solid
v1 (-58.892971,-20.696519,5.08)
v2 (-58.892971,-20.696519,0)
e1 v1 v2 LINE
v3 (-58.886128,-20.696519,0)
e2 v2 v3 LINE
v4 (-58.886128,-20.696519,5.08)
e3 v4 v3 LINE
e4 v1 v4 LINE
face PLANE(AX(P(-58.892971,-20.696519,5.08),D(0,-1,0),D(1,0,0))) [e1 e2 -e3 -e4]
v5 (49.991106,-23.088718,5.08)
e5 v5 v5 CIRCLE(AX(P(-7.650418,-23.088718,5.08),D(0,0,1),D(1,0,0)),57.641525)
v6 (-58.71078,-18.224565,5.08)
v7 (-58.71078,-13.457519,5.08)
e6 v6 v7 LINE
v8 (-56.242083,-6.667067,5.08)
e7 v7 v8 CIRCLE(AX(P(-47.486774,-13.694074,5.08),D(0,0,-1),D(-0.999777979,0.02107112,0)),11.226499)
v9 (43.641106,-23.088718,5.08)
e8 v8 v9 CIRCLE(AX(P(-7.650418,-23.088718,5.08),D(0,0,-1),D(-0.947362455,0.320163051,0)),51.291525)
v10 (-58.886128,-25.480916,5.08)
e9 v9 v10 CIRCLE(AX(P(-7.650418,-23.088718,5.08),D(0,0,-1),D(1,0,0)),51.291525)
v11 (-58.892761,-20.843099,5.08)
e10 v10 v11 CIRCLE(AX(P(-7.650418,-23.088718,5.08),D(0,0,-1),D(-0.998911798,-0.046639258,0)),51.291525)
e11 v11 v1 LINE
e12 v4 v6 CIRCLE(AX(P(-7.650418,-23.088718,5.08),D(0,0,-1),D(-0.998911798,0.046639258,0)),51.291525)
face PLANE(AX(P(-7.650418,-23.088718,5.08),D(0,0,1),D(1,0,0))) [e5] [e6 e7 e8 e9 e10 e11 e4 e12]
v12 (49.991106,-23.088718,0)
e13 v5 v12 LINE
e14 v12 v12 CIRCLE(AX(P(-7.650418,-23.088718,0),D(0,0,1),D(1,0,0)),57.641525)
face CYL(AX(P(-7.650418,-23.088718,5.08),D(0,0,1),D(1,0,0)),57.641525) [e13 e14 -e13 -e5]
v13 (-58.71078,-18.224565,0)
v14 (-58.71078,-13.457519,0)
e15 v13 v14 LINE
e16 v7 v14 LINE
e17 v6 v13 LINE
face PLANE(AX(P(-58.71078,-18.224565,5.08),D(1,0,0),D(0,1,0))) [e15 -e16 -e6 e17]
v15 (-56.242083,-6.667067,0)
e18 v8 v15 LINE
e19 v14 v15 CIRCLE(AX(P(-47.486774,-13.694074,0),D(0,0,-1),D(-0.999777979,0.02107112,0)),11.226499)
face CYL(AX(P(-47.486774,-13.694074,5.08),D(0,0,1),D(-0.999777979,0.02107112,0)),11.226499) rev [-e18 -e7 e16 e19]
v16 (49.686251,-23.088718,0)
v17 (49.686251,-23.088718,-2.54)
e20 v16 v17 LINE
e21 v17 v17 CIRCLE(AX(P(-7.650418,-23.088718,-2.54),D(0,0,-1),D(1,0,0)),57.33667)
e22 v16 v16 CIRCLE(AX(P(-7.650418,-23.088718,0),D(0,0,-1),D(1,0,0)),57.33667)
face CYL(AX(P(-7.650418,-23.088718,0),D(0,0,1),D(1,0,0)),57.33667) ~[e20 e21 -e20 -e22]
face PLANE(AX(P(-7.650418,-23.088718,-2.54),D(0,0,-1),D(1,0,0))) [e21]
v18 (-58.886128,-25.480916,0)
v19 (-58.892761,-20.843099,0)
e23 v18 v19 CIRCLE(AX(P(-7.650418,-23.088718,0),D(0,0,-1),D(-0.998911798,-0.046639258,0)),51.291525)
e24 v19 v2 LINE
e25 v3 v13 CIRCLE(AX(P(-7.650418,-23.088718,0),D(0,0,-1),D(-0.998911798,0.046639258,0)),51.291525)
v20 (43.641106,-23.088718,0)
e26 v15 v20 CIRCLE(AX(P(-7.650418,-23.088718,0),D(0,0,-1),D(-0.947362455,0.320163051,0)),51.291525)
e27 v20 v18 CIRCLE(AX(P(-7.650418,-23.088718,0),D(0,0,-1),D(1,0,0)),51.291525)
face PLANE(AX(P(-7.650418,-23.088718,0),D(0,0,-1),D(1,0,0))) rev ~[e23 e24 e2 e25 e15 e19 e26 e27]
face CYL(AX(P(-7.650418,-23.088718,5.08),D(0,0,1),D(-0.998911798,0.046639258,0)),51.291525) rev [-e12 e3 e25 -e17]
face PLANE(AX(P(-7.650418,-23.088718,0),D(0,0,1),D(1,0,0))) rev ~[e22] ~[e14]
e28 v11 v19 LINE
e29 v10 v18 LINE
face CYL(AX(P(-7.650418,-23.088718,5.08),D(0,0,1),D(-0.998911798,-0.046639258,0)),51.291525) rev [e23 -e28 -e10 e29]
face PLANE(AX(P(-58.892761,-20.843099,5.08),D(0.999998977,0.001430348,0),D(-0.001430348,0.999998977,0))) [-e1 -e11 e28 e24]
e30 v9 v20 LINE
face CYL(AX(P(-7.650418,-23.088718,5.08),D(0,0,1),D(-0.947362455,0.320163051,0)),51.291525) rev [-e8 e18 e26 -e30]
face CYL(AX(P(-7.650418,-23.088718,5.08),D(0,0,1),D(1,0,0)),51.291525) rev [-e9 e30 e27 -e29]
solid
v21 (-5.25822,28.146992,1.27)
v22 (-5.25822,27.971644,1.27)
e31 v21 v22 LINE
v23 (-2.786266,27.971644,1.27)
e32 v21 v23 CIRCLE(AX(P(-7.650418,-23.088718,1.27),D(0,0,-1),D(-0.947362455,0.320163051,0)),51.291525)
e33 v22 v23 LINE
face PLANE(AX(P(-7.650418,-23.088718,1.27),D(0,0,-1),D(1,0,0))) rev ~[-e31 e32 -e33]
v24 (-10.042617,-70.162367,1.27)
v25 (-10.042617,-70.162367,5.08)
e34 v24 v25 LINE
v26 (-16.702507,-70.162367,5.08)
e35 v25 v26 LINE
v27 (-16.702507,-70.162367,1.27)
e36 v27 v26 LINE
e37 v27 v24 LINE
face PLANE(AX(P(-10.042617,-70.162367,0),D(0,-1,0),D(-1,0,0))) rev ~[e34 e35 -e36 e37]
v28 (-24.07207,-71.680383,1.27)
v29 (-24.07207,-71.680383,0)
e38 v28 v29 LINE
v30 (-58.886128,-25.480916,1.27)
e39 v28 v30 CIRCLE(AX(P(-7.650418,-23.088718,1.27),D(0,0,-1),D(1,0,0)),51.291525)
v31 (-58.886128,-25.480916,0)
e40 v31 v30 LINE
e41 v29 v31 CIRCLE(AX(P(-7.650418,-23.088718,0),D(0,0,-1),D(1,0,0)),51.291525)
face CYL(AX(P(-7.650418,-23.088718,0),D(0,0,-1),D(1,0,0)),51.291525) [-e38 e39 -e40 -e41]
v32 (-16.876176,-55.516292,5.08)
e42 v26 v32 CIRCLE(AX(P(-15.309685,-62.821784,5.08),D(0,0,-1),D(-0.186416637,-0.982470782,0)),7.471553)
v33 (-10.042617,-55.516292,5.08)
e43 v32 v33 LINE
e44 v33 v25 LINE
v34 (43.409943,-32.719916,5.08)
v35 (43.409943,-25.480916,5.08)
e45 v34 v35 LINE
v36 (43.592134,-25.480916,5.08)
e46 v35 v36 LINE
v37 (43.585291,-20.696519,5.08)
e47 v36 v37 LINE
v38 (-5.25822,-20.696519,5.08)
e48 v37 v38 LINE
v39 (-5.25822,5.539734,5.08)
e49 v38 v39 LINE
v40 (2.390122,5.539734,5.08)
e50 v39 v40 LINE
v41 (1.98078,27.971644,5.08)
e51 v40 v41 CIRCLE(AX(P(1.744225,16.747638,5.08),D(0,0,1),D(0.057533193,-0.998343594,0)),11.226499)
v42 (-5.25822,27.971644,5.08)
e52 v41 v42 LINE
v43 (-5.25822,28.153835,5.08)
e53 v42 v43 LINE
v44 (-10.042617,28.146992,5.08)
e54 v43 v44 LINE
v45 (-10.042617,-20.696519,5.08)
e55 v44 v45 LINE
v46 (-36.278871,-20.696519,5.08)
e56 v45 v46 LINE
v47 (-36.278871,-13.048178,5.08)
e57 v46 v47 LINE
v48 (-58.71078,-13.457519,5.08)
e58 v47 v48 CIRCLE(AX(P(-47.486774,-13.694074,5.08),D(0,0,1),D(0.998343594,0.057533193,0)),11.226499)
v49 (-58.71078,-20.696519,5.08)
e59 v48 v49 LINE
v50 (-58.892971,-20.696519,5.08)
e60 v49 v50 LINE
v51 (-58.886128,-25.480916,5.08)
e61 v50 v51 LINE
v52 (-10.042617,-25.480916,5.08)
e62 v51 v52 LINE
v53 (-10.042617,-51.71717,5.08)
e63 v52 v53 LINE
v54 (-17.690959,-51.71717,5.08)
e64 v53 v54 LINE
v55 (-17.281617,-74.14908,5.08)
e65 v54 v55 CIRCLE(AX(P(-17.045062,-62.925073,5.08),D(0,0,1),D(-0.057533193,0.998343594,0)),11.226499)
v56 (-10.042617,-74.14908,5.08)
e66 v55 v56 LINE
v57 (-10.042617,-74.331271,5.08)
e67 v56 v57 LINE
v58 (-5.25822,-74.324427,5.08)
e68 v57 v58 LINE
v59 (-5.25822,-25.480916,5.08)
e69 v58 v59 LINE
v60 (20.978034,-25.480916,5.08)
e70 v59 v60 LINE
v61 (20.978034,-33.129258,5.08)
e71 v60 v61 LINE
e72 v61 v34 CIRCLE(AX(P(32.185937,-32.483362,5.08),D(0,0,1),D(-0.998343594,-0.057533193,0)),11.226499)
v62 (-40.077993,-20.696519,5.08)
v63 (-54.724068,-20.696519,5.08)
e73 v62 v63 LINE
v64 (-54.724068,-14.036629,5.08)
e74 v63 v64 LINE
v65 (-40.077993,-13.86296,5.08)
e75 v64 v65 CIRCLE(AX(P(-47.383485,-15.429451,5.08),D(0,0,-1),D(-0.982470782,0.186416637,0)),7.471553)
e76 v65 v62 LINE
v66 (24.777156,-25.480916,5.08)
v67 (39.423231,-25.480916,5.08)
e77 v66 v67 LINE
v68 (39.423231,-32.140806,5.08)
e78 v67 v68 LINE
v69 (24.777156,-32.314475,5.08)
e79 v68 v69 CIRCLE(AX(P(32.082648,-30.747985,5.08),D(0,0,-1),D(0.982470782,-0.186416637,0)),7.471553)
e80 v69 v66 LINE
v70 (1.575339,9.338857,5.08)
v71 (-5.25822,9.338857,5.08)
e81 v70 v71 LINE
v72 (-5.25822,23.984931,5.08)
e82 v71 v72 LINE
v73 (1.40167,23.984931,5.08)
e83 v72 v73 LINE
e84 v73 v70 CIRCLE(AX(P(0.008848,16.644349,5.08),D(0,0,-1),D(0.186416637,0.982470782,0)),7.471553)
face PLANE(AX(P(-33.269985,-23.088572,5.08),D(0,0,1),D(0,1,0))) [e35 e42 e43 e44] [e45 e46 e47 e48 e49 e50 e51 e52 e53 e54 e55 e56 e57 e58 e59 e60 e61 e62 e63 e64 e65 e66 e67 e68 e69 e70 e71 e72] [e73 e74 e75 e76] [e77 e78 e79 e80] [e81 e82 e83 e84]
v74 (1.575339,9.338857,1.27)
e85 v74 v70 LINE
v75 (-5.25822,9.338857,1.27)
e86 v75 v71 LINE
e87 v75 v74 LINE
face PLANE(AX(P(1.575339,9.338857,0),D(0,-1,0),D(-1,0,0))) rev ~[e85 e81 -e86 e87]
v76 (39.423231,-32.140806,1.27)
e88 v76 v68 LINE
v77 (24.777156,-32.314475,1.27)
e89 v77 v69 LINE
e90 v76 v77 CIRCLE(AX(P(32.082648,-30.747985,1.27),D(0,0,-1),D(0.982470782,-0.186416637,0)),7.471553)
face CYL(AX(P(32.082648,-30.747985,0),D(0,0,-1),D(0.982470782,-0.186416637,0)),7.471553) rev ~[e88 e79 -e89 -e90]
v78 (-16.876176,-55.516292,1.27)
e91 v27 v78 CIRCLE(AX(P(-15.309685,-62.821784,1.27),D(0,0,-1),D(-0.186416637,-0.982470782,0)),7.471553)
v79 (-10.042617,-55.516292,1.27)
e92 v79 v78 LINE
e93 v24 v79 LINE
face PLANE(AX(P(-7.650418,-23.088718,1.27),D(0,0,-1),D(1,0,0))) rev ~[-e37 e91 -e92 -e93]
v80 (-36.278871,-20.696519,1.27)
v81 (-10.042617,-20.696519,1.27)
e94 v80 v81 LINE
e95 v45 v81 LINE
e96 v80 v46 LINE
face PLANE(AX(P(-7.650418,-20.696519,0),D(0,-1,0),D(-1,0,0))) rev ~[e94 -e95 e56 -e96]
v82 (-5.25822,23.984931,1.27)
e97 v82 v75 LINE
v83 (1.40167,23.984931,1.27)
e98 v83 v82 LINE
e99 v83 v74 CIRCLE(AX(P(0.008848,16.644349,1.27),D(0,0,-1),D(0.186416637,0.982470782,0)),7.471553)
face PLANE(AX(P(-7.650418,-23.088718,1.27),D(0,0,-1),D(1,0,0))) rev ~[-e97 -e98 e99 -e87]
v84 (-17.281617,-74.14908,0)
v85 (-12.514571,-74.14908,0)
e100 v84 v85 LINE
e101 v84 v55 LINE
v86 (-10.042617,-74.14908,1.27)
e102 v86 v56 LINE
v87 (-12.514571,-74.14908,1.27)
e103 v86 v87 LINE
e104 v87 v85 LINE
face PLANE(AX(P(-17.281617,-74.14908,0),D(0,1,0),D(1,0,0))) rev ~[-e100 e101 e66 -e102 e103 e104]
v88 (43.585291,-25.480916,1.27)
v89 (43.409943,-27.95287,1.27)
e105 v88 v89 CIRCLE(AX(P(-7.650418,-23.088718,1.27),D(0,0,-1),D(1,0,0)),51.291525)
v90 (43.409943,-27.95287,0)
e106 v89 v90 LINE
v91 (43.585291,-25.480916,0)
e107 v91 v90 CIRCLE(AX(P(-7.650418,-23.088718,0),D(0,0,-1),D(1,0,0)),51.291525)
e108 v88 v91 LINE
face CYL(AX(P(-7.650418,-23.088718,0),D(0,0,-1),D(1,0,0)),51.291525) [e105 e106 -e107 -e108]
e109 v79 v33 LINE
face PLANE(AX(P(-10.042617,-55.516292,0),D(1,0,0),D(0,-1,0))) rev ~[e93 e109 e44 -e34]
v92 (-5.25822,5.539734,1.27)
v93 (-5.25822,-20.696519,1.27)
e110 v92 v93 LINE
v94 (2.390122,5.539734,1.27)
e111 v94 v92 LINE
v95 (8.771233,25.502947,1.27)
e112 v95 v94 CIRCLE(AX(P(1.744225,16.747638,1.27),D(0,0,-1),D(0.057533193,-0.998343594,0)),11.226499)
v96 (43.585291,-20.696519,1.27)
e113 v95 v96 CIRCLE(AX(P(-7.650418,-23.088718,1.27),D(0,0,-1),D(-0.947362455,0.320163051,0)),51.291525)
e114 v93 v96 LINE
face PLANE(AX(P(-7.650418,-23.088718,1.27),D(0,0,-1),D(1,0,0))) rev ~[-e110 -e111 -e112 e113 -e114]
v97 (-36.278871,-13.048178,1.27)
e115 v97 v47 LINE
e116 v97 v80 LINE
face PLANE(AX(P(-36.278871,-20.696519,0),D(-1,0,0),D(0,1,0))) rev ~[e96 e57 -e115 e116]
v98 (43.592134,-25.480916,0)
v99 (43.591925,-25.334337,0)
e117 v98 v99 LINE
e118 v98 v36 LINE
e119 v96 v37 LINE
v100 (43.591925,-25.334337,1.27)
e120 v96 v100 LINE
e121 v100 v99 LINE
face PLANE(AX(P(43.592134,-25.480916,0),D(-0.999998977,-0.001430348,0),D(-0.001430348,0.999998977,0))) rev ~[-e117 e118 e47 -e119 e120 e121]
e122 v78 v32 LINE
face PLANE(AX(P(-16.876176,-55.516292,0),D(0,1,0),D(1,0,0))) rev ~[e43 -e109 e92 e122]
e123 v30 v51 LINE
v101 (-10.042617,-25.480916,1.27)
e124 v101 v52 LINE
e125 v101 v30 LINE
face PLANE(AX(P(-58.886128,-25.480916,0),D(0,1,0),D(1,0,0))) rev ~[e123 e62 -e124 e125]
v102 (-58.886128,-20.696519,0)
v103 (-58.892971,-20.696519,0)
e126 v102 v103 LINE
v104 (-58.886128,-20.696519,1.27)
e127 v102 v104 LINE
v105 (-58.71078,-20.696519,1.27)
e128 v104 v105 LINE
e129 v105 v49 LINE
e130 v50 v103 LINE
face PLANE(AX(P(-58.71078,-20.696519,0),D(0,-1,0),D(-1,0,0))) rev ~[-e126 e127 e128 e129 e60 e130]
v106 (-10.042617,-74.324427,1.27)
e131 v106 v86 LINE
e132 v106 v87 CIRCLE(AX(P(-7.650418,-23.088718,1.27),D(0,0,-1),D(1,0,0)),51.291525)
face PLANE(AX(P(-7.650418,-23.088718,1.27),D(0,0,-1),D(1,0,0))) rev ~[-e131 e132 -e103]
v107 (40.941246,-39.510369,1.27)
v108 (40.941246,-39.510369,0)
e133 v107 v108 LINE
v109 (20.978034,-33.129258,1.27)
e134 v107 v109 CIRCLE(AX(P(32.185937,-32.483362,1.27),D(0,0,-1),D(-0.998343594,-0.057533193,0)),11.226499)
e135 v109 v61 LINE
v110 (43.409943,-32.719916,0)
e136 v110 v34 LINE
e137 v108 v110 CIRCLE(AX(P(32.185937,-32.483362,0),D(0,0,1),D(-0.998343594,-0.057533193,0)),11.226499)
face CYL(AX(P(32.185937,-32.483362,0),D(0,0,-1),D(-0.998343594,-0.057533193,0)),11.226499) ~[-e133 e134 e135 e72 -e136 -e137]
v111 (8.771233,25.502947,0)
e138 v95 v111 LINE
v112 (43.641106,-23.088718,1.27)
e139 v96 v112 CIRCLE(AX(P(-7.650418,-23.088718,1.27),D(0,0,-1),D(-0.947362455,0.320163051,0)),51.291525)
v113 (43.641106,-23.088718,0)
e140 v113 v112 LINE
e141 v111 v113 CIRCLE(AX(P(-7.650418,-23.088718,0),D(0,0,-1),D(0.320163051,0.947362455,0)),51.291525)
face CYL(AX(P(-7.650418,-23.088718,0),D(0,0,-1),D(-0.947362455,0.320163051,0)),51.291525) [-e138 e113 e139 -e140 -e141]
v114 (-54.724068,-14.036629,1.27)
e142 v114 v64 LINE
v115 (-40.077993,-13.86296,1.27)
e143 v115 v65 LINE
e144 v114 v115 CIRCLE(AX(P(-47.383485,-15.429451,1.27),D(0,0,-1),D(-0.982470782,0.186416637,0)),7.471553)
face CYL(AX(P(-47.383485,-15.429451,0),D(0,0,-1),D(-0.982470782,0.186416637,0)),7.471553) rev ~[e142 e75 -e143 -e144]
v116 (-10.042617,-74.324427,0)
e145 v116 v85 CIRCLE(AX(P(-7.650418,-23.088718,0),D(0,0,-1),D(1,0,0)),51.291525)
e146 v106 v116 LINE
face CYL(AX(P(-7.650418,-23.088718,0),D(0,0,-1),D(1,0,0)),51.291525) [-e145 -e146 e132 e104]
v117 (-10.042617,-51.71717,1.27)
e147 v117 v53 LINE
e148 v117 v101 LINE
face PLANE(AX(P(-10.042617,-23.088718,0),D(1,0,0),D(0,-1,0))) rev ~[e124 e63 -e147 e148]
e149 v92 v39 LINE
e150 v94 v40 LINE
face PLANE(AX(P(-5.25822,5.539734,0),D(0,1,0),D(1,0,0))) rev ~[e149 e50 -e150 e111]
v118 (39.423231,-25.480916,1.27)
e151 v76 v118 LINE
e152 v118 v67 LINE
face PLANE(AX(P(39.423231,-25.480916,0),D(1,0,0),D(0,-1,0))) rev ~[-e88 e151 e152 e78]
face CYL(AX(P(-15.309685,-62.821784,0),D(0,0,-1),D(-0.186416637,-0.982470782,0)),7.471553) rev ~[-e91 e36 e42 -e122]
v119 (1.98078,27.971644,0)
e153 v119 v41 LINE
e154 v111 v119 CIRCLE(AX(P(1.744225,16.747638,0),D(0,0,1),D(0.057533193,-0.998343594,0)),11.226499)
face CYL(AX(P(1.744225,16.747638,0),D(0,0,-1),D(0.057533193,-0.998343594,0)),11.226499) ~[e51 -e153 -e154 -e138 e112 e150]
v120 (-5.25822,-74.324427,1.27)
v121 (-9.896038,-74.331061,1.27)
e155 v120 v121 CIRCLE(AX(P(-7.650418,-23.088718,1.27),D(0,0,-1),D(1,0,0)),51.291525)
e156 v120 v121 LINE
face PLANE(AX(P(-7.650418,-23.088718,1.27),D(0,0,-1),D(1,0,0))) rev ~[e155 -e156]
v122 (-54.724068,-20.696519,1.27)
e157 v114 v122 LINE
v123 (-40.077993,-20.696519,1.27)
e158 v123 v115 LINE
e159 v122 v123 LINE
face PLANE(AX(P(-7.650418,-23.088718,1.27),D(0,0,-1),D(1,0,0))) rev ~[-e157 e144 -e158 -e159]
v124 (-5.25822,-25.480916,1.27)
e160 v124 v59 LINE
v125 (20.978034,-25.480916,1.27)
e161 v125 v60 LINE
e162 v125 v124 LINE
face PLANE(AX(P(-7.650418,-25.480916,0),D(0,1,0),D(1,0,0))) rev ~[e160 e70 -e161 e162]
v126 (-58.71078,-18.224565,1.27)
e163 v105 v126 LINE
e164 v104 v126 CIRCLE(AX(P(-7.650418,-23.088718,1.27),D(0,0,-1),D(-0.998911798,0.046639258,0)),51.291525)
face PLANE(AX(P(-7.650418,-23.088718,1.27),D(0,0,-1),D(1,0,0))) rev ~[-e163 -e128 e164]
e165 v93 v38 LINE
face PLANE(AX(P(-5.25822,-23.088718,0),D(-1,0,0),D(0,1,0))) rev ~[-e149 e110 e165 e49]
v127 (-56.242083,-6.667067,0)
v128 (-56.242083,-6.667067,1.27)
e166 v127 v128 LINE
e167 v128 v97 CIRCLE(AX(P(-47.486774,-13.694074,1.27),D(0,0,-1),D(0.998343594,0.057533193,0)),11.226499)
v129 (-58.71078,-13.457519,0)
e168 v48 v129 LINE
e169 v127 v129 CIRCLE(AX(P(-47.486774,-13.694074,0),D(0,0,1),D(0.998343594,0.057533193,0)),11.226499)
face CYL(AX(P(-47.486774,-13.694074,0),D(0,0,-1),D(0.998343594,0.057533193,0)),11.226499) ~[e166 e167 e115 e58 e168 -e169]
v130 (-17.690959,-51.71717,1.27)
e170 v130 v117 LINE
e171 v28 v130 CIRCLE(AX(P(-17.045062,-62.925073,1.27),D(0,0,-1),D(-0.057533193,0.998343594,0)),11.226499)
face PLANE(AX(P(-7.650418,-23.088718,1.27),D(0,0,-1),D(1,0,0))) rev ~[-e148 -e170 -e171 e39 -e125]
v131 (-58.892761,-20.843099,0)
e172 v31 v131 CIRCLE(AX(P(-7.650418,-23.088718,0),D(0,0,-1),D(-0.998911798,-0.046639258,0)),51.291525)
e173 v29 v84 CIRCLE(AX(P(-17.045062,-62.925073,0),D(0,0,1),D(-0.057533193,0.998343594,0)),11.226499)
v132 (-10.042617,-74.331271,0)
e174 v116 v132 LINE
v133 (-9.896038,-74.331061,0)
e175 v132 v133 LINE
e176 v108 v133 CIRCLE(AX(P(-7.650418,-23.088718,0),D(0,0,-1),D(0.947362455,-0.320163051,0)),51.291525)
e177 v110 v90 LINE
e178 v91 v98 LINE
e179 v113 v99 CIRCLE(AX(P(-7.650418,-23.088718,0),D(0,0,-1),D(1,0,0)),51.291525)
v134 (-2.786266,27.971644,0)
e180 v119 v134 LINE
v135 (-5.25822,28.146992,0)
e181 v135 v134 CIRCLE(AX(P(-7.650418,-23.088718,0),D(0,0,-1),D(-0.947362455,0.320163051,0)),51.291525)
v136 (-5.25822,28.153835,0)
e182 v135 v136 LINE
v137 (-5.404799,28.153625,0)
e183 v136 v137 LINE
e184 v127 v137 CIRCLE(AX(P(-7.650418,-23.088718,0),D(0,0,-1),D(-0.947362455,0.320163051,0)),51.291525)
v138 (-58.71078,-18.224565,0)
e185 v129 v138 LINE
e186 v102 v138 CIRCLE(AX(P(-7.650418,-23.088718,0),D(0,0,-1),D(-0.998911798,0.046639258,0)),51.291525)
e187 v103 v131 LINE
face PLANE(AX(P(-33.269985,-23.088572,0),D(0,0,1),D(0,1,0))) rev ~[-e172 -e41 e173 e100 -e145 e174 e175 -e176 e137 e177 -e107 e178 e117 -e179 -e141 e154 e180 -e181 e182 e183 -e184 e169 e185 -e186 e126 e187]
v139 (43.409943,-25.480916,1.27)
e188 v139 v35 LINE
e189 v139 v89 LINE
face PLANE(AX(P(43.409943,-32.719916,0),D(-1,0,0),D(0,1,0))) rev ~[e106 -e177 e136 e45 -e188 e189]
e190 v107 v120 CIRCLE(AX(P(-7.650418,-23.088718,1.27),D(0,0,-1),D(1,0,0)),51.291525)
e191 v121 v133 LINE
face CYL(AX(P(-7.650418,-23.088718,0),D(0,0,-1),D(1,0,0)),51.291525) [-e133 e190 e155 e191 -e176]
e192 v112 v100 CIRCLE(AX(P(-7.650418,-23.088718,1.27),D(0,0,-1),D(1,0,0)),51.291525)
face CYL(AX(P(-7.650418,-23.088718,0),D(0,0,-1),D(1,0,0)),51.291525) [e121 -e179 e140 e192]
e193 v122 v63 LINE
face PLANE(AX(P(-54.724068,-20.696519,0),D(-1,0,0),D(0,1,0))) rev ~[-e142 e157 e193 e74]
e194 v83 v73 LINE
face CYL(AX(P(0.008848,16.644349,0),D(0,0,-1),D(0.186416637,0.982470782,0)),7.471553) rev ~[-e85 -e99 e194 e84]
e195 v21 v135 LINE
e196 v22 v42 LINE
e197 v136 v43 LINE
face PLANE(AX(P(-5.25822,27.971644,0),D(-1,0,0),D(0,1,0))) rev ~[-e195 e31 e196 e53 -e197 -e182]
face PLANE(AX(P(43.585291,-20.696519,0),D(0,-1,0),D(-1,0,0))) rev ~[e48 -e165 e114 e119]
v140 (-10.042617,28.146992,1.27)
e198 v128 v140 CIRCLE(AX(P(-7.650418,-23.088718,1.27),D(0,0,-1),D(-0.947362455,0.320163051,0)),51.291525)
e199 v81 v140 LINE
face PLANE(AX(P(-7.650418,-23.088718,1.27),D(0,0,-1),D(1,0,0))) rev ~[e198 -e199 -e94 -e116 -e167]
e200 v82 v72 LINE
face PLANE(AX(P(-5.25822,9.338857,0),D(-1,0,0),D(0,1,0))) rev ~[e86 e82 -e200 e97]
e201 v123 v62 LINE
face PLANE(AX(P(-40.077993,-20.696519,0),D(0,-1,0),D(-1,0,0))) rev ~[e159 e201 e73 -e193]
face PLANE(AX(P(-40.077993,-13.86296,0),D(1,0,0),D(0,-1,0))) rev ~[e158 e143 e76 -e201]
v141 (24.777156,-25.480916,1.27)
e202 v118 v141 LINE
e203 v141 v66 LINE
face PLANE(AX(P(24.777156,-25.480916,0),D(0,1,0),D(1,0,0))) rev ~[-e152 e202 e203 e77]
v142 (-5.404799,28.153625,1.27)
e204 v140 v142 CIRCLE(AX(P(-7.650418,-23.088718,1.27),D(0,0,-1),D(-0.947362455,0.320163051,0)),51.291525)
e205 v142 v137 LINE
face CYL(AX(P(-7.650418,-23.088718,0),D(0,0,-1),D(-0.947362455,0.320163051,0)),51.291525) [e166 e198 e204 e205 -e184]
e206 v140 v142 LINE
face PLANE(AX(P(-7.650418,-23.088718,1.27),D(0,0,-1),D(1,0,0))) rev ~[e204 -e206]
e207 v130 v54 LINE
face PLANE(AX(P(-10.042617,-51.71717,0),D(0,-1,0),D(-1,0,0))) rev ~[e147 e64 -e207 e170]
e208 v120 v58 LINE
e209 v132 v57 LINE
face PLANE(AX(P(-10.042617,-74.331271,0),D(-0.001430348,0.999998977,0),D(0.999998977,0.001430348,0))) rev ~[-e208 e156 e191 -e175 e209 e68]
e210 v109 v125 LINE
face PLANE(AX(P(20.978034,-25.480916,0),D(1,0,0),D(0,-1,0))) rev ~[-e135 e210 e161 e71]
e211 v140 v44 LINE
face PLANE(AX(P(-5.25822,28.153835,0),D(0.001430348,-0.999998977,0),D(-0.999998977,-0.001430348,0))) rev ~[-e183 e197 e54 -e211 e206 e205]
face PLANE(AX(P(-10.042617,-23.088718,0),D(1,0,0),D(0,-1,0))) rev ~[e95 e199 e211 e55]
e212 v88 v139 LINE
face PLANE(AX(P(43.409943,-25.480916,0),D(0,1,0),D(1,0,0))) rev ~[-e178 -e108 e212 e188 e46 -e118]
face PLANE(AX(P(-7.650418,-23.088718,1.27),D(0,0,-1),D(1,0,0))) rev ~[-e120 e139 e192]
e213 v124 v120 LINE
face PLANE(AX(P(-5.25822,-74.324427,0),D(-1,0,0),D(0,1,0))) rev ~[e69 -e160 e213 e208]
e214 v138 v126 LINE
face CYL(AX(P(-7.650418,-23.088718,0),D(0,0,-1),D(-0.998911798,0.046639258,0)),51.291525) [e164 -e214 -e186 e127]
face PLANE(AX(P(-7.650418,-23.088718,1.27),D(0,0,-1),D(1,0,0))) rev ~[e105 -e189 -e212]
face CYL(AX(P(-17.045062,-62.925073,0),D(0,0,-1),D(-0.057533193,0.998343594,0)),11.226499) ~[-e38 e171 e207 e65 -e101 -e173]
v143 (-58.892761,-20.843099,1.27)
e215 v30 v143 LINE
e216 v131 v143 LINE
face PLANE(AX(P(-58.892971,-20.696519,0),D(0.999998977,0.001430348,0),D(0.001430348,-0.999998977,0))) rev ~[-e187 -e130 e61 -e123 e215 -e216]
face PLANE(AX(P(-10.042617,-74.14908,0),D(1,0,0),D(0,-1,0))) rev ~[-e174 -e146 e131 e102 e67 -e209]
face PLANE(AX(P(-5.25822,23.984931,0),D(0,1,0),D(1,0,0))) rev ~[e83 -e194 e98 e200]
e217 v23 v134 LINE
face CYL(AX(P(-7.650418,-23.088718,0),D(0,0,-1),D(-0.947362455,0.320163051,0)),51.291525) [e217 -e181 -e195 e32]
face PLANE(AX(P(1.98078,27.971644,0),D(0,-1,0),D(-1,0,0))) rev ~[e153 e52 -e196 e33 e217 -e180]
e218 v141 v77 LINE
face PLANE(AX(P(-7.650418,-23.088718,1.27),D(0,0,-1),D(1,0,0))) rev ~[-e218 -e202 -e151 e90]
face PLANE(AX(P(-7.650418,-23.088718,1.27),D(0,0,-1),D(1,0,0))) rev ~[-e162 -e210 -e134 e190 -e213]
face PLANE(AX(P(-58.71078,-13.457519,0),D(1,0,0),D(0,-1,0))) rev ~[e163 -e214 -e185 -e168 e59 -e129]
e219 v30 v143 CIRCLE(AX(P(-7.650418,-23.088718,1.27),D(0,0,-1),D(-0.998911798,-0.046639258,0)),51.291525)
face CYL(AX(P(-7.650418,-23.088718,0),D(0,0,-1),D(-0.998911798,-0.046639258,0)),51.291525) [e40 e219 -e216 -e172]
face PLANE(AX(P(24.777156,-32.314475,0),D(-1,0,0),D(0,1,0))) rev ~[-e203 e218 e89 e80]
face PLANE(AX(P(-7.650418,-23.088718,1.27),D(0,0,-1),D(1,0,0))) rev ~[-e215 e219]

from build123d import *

# Parameters (mm, degrees)
F1_DEPTH = 5.08
F3_COUNT = 4
F4_R     = 57.6415248938
F5_DEPTH = 5.0800000317
F6_R     = 57.3366696562
F7_DEPTH = 2.54
F8_DEPTH = 1.27


with BuildPart() as f1:
    # F0 (on Top) → F1 (new body)
    with BuildSketch(Plane.XY):
        Polygon((-5.2582197823, 28.1538348645), (-10.0426170975, 28.1469915062), (-10.0426170975, -23.0887178332), (-5.2582197823, -23.0887178332), (-5.2582197823, 5.5397343822), (-5.2582197823, 9.3388566747), (-5.2582197823, 23.9849314094), (-5.2582197823, 27.9716439545), align=None)
        with BuildLine():
            Line((1.9807802177, 27.9716439545), (-5.2582197823, 27.9716439545))
            Line((-5.2582197823, 27.9716439545), (-5.2582197823, 23.9849314094))
            Line((-5.2582197823, 23.9849314094), (1.4016701607, 23.9849314094))
            ThreePointArc((1.4016701607, 23.9849314094), (7.4798763217, 16.7329380114), (1.5753391199, 9.3388566747))
            Line((1.5753391199, 9.3388566747), (-5.2582197823, 9.3388566747))
            Line((-5.2582197823, 9.3388566747), (-5.2582197823, 5.5397343822))
            Line((-5.2582197823, 5.5397343822), (2.390121635, 5.5397343822))
            ThreePointArc((2.390121635, 5.5397343822), (12.9688554502, 16.952466624), (1.9807802177, 27.9716439545))
        make_face()
    extrude(amount=F1_DEPTH)


with BuildPart() as f3_1:
    # F3: instance of F1
    add(f1.part.rotate(Axis((-7.6504184399, -23.0887178332, 2.54), (0, 0, -1)), 1 * 360 / F3_COUNT))


with BuildPart() as f3_2:
    # F3: instance of F1
    add(f1.part.rotate(Axis((-7.6504184399, -23.0887178332, 2.54), (0, 0, -1)), 2 * 360 / F3_COUNT))


with BuildPart() as f3_3:
    # F3: instance of F1
    add(f1.part.rotate(Axis((-7.6504184399, -23.0887178332, 2.54), (0, 0, -1)), 3 * 360 / F3_COUNT))


with BuildPart() as f5:
    # F4 (on face) → F5 (new body)
    with BuildSketch(Plane.XY.offset(5.08)):
        with Locations((-7.6504184399, -23.0887178332)):
            Circle(F4_R)
        with BuildLine():
            ThreePointArc((43.6411064539, -23.0887178332), (-6.4539935787, -74.3662869397), (-58.8861277793, -25.4809164908))
            ThreePointArc((-58.8861277793, -25.4809164908), (-58.9418908651, -23.1620825433), (-58.8927614778, -20.8430985631))
            Line((-58.8927614778, -20.8430985631), (-58.8929711375, -20.6965191755))
            Line((-58.8929711375, -20.6965191755), (-58.8861277793, -20.6965191755))
            ThreePointArc((-58.8861277793, -20.6965191755), (-58.8133853302, -19.4594830782), (-58.7107802276, -18.2245652823))
            Line((-58.7107802276, -18.2245652823), (-58.7107802276, -13.4575191755))
            ThreePointArc((-58.7107802276, -13.4575191755), (-58.0376423972, -9.8582625341), (-56.2420833712, -6.6670667248))
            ThreePointArc((-56.2420833712, -6.6670667248), (0.6706372164, 27.5233415864), (43.6411064539, -23.0887178332))
        make_face(mode=Mode.SUBTRACT)
    extrude(amount=-F5_DEPTH)

    # F6 (on face) → F7 (join)
    with BuildSketch(Plane(origin=(0, 0, 0), x_dir=(1, 0, 0), z_dir=(0, 0, -1))):
        with Locations((-7.6504184399, 23.0887178332)):
            Circle(F6_R)
    extrude(amount=F7_DEPTH)


with BuildPart() as f1_1:
    add(f1.part)

    # F8 (add): a face of the model
    f8_faces = [f5.part.faces().sort_by_distance(p)[0] for p in [
        (-7.6873982389, -23.0802766419, 0),
    ]]

    add(f3_1.part)  # F8 merges F3_1

    add(f3_2.part)  # F8 merges F3_2

    add(f3_3.part)  # F8 merges F3_3
    extrude(f8_faces, amount=F8_DEPTH)


solid = Compound([f5.part, f1_1.part])
